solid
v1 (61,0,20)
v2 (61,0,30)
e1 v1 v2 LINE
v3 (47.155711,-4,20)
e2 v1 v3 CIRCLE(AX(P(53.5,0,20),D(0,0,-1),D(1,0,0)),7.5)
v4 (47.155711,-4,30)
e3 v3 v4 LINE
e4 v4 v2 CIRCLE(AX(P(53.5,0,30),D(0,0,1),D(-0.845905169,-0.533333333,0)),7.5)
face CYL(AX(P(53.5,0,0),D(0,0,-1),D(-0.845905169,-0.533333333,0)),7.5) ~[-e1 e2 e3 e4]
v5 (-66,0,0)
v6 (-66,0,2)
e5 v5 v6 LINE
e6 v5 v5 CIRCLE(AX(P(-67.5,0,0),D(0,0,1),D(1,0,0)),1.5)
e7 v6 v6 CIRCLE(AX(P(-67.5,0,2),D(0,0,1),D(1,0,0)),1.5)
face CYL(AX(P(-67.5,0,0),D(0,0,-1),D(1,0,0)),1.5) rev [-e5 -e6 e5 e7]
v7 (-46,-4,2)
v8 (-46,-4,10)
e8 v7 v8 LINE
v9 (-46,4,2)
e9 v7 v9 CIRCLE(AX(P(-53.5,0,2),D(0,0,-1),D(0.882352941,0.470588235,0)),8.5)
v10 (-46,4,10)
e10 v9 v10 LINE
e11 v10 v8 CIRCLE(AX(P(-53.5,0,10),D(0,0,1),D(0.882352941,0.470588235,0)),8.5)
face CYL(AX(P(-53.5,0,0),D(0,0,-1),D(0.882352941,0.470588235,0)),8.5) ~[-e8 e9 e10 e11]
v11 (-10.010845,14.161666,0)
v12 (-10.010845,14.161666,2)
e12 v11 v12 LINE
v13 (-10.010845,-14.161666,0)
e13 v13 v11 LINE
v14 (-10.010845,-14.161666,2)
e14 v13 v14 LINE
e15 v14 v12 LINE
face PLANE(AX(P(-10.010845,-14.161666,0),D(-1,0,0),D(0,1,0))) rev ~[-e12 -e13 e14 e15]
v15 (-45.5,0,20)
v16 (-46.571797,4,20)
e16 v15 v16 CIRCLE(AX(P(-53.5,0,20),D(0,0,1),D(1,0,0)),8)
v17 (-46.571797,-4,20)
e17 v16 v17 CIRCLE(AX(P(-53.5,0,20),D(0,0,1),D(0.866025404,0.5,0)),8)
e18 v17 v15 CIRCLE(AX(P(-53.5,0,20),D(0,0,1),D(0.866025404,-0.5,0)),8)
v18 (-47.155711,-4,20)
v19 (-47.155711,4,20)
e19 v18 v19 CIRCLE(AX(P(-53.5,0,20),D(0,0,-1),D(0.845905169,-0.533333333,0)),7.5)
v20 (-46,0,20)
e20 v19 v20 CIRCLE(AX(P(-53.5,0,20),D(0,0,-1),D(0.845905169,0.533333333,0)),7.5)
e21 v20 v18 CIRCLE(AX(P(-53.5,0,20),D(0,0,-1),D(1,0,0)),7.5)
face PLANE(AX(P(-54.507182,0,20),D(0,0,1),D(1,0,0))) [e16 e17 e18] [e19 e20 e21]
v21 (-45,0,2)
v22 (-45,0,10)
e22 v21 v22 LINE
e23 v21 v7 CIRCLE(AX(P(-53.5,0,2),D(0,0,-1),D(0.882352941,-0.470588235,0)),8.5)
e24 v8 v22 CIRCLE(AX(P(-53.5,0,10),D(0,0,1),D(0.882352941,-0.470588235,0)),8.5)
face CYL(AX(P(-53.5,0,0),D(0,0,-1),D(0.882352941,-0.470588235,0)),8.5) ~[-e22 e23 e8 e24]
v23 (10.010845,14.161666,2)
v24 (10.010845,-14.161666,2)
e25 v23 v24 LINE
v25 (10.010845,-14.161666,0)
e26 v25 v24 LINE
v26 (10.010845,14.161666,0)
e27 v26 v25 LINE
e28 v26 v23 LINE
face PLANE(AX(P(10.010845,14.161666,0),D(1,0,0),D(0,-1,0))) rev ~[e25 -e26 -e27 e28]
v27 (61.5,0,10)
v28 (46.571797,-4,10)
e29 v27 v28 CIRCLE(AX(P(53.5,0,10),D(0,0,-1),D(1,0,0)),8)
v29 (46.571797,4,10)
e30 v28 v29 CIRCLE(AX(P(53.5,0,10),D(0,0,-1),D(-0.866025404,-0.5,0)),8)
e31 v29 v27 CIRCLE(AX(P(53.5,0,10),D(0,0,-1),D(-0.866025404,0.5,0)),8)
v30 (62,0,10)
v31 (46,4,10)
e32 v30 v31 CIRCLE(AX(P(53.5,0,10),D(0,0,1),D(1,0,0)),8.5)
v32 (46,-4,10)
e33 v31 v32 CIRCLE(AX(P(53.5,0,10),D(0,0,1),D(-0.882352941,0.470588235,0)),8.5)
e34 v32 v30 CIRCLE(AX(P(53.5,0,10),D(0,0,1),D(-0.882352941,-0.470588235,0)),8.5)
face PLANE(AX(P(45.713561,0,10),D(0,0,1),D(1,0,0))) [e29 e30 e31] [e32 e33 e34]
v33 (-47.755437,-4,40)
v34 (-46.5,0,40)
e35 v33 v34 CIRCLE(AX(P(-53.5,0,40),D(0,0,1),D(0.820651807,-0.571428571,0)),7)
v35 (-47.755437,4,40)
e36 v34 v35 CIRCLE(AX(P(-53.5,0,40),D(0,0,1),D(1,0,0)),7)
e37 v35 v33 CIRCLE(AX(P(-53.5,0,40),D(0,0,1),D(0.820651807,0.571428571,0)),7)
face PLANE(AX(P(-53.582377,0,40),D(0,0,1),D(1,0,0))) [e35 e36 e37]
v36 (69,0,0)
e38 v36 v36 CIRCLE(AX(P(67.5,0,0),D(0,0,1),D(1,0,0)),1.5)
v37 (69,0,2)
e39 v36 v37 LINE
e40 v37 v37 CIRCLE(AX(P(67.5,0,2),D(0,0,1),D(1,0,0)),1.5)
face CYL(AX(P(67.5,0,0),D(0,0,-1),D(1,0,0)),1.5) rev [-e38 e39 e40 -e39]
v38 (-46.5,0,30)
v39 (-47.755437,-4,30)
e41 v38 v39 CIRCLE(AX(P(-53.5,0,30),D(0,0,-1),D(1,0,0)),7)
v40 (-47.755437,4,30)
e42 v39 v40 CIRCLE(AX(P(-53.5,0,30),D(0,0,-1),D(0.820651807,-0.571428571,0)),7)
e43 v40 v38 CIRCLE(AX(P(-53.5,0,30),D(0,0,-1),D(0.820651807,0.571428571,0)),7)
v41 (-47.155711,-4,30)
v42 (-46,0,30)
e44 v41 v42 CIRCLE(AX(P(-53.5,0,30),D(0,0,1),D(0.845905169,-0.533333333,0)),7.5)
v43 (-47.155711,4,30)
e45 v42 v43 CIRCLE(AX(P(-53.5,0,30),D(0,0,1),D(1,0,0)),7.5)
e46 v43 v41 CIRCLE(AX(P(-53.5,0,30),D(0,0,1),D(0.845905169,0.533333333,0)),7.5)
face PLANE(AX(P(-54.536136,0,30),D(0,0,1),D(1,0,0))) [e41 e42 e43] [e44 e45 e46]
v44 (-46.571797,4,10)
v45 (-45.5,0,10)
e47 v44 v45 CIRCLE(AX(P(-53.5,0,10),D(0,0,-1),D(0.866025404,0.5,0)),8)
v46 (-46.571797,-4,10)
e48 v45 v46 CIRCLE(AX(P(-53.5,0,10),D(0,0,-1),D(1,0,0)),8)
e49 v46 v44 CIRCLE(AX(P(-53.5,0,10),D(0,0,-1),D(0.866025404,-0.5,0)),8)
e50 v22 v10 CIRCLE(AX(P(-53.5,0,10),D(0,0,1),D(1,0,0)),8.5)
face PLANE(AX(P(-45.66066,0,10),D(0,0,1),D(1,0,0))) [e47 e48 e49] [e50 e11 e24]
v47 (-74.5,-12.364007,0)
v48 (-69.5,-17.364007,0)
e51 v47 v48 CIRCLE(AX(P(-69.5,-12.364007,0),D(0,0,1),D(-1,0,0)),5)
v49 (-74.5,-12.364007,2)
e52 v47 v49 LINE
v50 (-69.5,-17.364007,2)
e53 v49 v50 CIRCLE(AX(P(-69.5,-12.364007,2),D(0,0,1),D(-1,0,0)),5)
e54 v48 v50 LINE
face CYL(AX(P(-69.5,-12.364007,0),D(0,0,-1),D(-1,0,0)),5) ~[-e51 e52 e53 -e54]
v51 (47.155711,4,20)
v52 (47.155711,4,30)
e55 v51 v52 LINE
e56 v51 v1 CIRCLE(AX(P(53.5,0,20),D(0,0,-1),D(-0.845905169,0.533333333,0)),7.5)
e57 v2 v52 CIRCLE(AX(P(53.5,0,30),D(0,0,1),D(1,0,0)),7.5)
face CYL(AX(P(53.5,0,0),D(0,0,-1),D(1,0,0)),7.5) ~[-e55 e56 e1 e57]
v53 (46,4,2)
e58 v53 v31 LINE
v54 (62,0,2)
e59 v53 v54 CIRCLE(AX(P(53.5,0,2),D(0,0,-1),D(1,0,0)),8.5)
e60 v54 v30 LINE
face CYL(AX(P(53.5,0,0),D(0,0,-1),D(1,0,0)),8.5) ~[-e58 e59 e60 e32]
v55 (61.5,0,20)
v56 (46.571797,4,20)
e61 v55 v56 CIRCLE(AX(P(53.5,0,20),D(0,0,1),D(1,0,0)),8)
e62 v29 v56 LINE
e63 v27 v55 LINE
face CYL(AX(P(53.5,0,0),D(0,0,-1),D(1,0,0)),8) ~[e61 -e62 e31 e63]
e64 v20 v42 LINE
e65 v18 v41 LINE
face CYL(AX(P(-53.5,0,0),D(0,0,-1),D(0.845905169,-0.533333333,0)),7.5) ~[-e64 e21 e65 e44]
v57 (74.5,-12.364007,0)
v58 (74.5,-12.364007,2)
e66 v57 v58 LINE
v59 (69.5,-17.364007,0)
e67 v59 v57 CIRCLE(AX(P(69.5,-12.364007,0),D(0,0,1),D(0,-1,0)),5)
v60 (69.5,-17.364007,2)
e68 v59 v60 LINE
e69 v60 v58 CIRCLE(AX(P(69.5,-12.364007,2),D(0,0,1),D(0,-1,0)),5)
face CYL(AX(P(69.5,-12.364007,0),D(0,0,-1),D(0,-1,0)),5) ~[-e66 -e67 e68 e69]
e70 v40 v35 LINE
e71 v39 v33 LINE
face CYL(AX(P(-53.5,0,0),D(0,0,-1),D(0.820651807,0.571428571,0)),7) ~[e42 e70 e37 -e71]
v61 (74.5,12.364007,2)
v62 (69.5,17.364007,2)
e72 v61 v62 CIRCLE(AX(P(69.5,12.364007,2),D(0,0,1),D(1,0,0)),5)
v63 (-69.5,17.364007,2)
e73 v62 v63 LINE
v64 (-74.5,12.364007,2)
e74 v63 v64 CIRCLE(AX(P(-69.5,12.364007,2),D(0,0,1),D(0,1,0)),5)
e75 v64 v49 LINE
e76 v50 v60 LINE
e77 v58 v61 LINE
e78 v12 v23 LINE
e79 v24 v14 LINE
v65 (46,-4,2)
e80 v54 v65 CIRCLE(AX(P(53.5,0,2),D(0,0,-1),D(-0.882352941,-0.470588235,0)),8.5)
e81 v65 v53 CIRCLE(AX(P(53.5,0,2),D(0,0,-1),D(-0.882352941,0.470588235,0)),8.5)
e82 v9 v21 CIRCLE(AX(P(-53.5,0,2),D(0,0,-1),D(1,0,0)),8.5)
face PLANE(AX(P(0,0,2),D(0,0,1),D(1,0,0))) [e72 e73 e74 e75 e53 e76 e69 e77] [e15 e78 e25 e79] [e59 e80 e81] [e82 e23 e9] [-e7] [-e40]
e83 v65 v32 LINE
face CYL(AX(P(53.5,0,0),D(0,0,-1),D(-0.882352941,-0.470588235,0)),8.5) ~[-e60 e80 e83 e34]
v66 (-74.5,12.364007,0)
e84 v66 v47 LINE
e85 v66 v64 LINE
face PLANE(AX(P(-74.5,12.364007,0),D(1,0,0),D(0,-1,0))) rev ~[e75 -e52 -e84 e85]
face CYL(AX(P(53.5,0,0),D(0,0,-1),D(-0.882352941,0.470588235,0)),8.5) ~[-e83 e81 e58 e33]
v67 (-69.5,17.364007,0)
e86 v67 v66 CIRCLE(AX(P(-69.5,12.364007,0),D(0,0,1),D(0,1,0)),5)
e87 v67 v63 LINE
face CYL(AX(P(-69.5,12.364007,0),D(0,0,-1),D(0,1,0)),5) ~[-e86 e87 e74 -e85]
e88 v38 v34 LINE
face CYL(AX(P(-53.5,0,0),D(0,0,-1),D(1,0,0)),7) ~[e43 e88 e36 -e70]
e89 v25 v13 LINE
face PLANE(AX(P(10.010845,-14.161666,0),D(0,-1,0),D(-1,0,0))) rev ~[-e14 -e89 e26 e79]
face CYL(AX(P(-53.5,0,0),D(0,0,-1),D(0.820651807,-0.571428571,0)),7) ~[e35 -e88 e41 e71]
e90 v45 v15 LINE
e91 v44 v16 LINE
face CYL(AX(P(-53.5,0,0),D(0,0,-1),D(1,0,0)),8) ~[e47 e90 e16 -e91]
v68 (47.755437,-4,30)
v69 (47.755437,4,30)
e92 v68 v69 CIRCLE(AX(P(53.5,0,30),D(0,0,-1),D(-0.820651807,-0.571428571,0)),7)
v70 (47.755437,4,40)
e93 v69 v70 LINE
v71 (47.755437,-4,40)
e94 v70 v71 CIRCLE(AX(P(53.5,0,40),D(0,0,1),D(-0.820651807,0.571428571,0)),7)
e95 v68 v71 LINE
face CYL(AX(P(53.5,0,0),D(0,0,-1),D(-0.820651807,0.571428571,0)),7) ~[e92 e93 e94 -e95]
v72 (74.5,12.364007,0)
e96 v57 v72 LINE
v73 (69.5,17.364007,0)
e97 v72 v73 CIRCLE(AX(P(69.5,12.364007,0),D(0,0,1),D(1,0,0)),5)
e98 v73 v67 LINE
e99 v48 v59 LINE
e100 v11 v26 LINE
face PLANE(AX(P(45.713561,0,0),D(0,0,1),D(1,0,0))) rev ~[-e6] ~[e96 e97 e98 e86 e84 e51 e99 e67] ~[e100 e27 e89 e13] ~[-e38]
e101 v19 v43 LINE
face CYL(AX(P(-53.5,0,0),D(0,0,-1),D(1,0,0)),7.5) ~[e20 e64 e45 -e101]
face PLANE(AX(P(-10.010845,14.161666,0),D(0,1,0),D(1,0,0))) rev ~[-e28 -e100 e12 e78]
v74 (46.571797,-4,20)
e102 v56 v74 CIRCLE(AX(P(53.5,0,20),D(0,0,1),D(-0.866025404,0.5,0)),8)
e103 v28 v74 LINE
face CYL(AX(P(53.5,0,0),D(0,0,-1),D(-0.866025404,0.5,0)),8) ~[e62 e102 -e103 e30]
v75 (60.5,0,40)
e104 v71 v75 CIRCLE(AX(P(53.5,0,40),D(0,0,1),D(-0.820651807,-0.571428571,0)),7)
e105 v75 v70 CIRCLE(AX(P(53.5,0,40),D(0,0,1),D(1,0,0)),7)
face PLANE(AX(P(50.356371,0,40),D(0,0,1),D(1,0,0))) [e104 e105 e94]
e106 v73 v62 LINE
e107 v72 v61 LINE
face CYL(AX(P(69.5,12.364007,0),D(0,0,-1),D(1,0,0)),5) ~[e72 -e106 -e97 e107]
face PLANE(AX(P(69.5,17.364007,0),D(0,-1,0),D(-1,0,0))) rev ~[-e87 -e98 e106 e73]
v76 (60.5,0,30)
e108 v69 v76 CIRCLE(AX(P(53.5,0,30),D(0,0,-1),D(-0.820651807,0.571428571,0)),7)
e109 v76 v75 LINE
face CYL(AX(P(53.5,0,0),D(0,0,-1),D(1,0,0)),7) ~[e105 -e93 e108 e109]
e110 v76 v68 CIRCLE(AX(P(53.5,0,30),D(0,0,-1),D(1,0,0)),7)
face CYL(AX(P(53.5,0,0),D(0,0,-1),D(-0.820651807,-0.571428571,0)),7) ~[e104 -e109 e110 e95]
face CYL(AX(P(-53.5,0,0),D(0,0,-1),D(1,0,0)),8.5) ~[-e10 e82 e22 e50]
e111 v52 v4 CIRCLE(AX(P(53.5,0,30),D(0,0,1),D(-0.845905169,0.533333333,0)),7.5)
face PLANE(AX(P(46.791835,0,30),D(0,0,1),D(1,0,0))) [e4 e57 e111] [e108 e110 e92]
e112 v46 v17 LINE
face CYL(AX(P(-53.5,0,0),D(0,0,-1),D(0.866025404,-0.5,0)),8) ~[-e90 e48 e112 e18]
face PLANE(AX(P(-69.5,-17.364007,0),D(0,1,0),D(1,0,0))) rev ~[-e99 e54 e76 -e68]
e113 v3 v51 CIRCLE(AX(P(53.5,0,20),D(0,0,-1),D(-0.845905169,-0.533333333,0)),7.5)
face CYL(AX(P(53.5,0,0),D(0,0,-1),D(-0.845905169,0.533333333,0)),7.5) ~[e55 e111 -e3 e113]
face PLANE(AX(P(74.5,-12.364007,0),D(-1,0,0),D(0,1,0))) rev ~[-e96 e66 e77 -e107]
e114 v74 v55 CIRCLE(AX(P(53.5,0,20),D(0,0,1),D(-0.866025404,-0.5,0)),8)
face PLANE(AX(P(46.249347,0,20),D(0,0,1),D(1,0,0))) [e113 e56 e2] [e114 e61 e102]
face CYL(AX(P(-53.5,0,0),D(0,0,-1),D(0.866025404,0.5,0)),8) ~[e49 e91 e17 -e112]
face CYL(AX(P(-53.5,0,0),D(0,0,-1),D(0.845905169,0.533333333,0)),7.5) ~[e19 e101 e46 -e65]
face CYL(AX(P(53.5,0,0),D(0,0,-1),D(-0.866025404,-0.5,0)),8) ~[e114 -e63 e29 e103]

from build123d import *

# Parameters (mm, degrees)
F0_R     = 1.5
F1_DEPTH = 2
F2_DEPTH = 40
F3_DEPTH = 30
F4_DEPTH = 20
F5_DEPTH = 10


with BuildPart() as f1:
    # F0 (on Top) → F1 (new body)
    with BuildSketch(Plane.XY):
        with BuildLine():
            Line((69.5, 17.3640065603), (-69.5, 17.3640065603))
            ThreePointArc((-69.5, 17.3640065603), (-73.0355339059, 15.8995404662), (-74.5, 12.3640065603))
            Line((-74.5, 12.3640065603), (-74.5, -12.3640065603))
            ThreePointArc((-74.5, -12.3640065603), (-73.0355339059, -15.8995404662), (-69.5, -17.3640065603))
            Line((-69.5, -17.3640065603), (69.5, -17.3640065603))
            ThreePointArc((69.5, -17.3640065603), (73.0355339059, -15.8995404662), (74.5, -12.3640065603))
            Line((74.5, -12.3640065603), (74.5, 12.3640065603))
            ThreePointArc((74.5, 12.3640065603), (73.0355339059, 15.8995404662), (69.5, 17.3640065603))
        make_face()
        with Locations((-67.5, 0)):
            Circle(F0_R, mode=Mode.SUBTRACT)
        with BuildLine():
            ThreePointArc((-46, -4), (-62, 0), (-46, 4))
            Line((-46, 4), (-10.0108450279, 4))
            Line((-10.0108450279, 4), (-10.0108450279, 14.1616659239))
            Line((-10.0108450279, 14.1616659239), (10.0108450279, 14.1616659239))
            Line((10.0108450279, 14.1616659239), (10.0108450279, 4))
            Line((10.0108450279, 4), (46, 4))
            ThreePointArc((46, 4), (55.5615528128, 8.2462112512), (62, 0))
            ThreePointArc((62, 0), (55.5615528128, -8.2462112512), (46, -4))
            Line((46, -4), (10.0108450279, -4))
            Line((10.0108450279, -4), (10.0108450279, -14.1616659239))
            Line((10.0108450279, -14.1616659239), (-10.0108450279, -14.1616659239))
            Line((-10.0108450279, -14.1616659239), (-10.0108450279, -4))
            Line((-10.0108450279, -4), (-46, -4))
        make_face(mode=Mode.SUBTRACT)
        with Locations((67.5, 0)):
            Circle(F0_R, mode=Mode.SUBTRACT)
        with BuildLine():
            Line((-10.0108450279, 4), (-46, 4))
            ThreePointArc((-46, 4), (-45.2537887488, 2.0615528128), (-45, 0))
            ThreePointArc((-45, 0), (-45.2537887488, -2.0615528128), (-46, -4))
            Line((-46, -4), (-10.0108450279, -4))
            Line((-10.0108450279, -4), (-10.0108450279, 4))
        make_face()
        with BuildLine():
            Line((46, 4), (10.0108450279, 4))
            Line((10.0108450279, 4), (10.0108450279, -4))
            Line((10.0108450279, -4), (46, -4))
            ThreePointArc((46, -4), (45, 0), (46, 4))
        make_face()
        with BuildLine():
            ThreePointArc((-47.7554373535, -4), (-46.8212299588, -2.0961943462), (-46.5, 0))
            ThreePointArc((-46.5, 0), (-46.8212299588, 2.0961943462), (-47.7554373535, 4))
            Line((-47.7554373535, 4), (-53.5, 4))
            Line((-53.5, 4), (-53.5, -4))
            Line((-53.5, -4), (-47.7554373535, -4))
        make_face()
        with BuildLine():
            Line((-53.5, 4), (-47.7554373535, 4))
            ThreePointArc((-47.7554373535, 4), (-60.5, 0), (-47.7554373535, -4))
            Line((-47.7554373535, -4), (-53.5, -4))
            Line((-53.5, -4), (-53.5, 4))
        make_face()
        with BuildLine():
            ThreePointArc((-47.7554373535, -4), (-60.5, 0), (-47.7554373535, 4))
            Line((-47.7554373535, 4), (-47.1557112298, 4))
            ThreePointArc((-47.1557112298, 4), (-61, 0), (-47.1557112298, -4))
            Line((-47.1557112298, -4), (-47.7554373535, -4))
        make_face()
        with BuildLine():
            ThreePointArc((-47.1557112298, -4), (-61, 0), (-47.1557112298, 4))
            Line((-47.1557112298, 4), (-46.5717967697, 4))
            ThreePointArc((-46.5717967697, 4), (-61.5, 0), (-46.5717967697, -4))
            Line((-46.5717967697, -4), (-47.1557112298, -4))
        make_face()
        with BuildLine():
            ThreePointArc((-46.5717967697, -4), (-61.5, 0), (-46.5717967697, 4))
            Line((-46.5717967697, 4), (-46, 4))
            ThreePointArc((-46, 4), (-62, 0), (-46, -4))
            Line((-46, -4), (-46.5717967697, -4))
        make_face()
        with BuildLine():
            ThreePointArc((-47.7554373535, 4), (-46.8212299588, 2.0961943462), (-46.5, 0))
            ThreePointArc((-46.5, 0), (-46.8212299588, -2.0961943462), (-47.7554373535, -4))
            Line((-47.7554373535, -4), (-47.1557112298, -4))
            ThreePointArc((-47.1557112298, -4), (-46.2947184033, -2.0818062138), (-46, 0))
            ThreePointArc((-46, 0), (-46.2947184033, 2.0818062138), (-47.1557112298, 4))
            Line((-47.1557112298, 4), (-47.7554373535, 4))
        make_face()
        with BuildLine():
            Line((-46.5717967697, 4), (-47.1557112298, 4))
            ThreePointArc((-47.1557112298, 4), (-46.2947184033, 2.0818062138), (-46, 0))
            ThreePointArc((-46, 0), (-46.2947184033, -2.0818062138), (-47.1557112298, -4))
            Line((-47.1557112298, -4), (-46.5717967697, -4))
            ThreePointArc((-46.5717967697, -4), (-45.7725933897, -2.0705523608), (-45.5, 0))
            ThreePointArc((-45.5, 0), (-45.7725933897, 2.0705523608), (-46.5717967697, 4))
        make_face()
        with BuildLine():
            Line((-46, 4), (-46.5717967697, 4))
            ThreePointArc((-46.5717967697, 4), (-45.7725933897, 2.0705523608), (-45.5, 0))
            ThreePointArc((-45.5, 0), (-45.7725933897, -2.0705523608), (-46.5717967697, -4))
            Line((-46.5717967697, -4), (-46, -4))
            ThreePointArc((-46, -4), (-45.2537887488, -2.0615528128), (-45, 0))
            ThreePointArc((-45, 0), (-45.2537887488, 2.0615528128), (-46, 4))
        make_face()
        with BuildLine():
            ThreePointArc((60.5, 0), (55.5961943462, 6.6787700412), (47.7554373535, 4))
            Line((47.7554373535, 4), (53.5, 4))
            Line((53.5, 4), (53.5, -4))
            Line((53.5, -4), (47.7554373535, -4))
            ThreePointArc((47.7554373535, -4), (55.5961943462, -6.6787700412), (60.5, 0))
        make_face()
        with BuildLine():
            Line((53.5, 4), (47.7554373535, 4))
            ThreePointArc((47.7554373535, 4), (46.5, 0), (47.7554373535, -4))
            Line((47.7554373535, -4), (53.5, -4))
            Line((53.5, -4), (53.5, 4))
        make_face()
        with BuildLine():
            Line((47.7554373535, 4), (47.1557112298, 4))
            ThreePointArc((47.1557112298, 4), (46, 0), (47.1557112298, -4))
            Line((47.1557112298, -4), (47.7554373535, -4))
            ThreePointArc((47.7554373535, -4), (46.5, 0), (47.7554373535, 4))
        make_face()
        with BuildLine():
            Line((47.1557112298, 4), (46.5717967697, 4))
            ThreePointArc((46.5717967697, 4), (45.5, 0), (46.5717967697, -4))
            Line((46.5717967697, -4), (47.1557112298, -4))
            ThreePointArc((47.1557112298, -4), (46, 0), (47.1557112298, 4))
        make_face()
        with BuildLine():
            Line((46.5717967697, 4), (46, 4))
            ThreePointArc((46, 4), (45, 0), (46, -4))
            Line((46, -4), (46.5717967697, -4))
            ThreePointArc((46.5717967697, -4), (45.5, 0), (46.5717967697, 4))
        make_face()
        with BuildLine():
            ThreePointArc((62, 0), (55.5615528128, 8.2462112512), (46, 4))
            Line((46, 4), (46.5717967697, 4))
            ThreePointArc((46.5717967697, 4), (55.5705523608, 7.7274066103), (61.5, 0))
            ThreePointArc((61.5, 0), (55.5705523608, -7.7274066103), (46.5717967697, -4))
            Line((46.5717967697, -4), (46, -4))
            ThreePointArc((46, -4), (55.5615528128, -8.2462112512), (62, 0))
        make_face()
        with BuildLine():
            ThreePointArc((61.5, 0), (55.5705523608, 7.7274066103), (46.5717967697, 4))
            Line((46.5717967697, 4), (47.1557112298, 4))
            ThreePointArc((47.1557112298, 4), (55.5818062138, 7.2052815967), (61, 0))
            ThreePointArc((61, 0), (55.5818062138, -7.2052815967), (47.1557112298, -4))
            Line((47.1557112298, -4), (46.5717967697, -4))
            ThreePointArc((46.5717967697, -4), (55.5705523608, -7.7274066103), (61.5, 0))
        make_face()
        with BuildLine():
            ThreePointArc((61, 0), (55.5818062138, 7.2052815967), (47.1557112298, 4))
            Line((47.1557112298, 4), (47.7554373535, 4))
            ThreePointArc((47.7554373535, 4), (55.5961943462, 6.6787700412), (60.5, 0))
            ThreePointArc((60.5, 0), (55.5961943462, -6.6787700412), (47.7554373535, -4))
            Line((47.7554373535, -4), (47.1557112298, -4))
            ThreePointArc((47.1557112298, -4), (55.5818062138, -7.2052815967), (61, 0))
        make_face()
    extrude(amount=F1_DEPTH)

    # F0 (on Top) → F2 (join)
    with BuildSketch(Plane.XY):
        with BuildLine():
            Line((-53.5, 4), (-47.7554373535, 4))
            ThreePointArc((-47.7554373535, 4), (-60.5, 0), (-47.7554373535, -4))
            Line((-47.7554373535, -4), (-53.5, -4))
            Line((-53.5, -4), (-53.5, 4))
        make_face()
        with BuildLine():
            ThreePointArc((-47.7554373535, -4), (-46.8212299588, -2.0961943462), (-46.5, 0))
            ThreePointArc((-46.5, 0), (-46.8212299588, 2.0961943462), (-47.7554373535, 4))
            Line((-47.7554373535, 4), (-53.5, 4))
            Line((-53.5, 4), (-53.5, -4))
            Line((-53.5, -4), (-47.7554373535, -4))
        make_face()
        with BuildLine():
            Line((53.5, 4), (47.7554373535, 4))
            ThreePointArc((47.7554373535, 4), (46.5, 0), (47.7554373535, -4))
            Line((47.7554373535, -4), (53.5, -4))
            Line((53.5, -4), (53.5, 4))
        make_face()
        with BuildLine():
            ThreePointArc((60.5, 0), (55.5961943462, 6.6787700412), (47.7554373535, 4))
            Line((47.7554373535, 4), (53.5, 4))
            Line((53.5, 4), (53.5, -4))
            Line((53.5, -4), (47.7554373535, -4))
            ThreePointArc((47.7554373535, -4), (55.5961943462, -6.6787700412), (60.5, 0))
        make_face()
    extrude(amount=F2_DEPTH)

    # F0 (on Top) → F3 (join)
    with BuildSketch(Plane.XY):
        with BuildLine():
            ThreePointArc((-47.7554373535, -4), (-60.5, 0), (-47.7554373535, 4))
            Line((-47.7554373535, 4), (-47.1557112298, 4))
            ThreePointArc((-47.1557112298, 4), (-61, 0), (-47.1557112298, -4))
            Line((-47.1557112298, -4), (-47.7554373535, -4))
        make_face()
        with BuildLine():
            ThreePointArc((-47.7554373535, 4), (-46.8212299588, 2.0961943462), (-46.5, 0))
            ThreePointArc((-46.5, 0), (-46.8212299588, -2.0961943462), (-47.7554373535, -4))
            Line((-47.7554373535, -4), (-47.1557112298, -4))
            ThreePointArc((-47.1557112298, -4), (-46.2947184033, -2.0818062138), (-46, 0))
            ThreePointArc((-46, 0), (-46.2947184033, 2.0818062138), (-47.1557112298, 4))
            Line((-47.1557112298, 4), (-47.7554373535, 4))
        make_face()
        with BuildLine():
            Line((47.7554373535, 4), (47.1557112298, 4))
            ThreePointArc((47.1557112298, 4), (46, 0), (47.1557112298, -4))
            Line((47.1557112298, -4), (47.7554373535, -4))
            ThreePointArc((47.7554373535, -4), (46.5, 0), (47.7554373535, 4))
        make_face()
        with BuildLine():
            ThreePointArc((61, 0), (55.5818062138, 7.2052815967), (47.1557112298, 4))
            Line((47.1557112298, 4), (47.7554373535, 4))
            ThreePointArc((47.7554373535, 4), (55.5961943462, 6.6787700412), (60.5, 0))
            ThreePointArc((60.5, 0), (55.5961943462, -6.6787700412), (47.7554373535, -4))
            Line((47.7554373535, -4), (47.1557112298, -4))
            ThreePointArc((47.1557112298, -4), (55.5818062138, -7.2052815967), (61, 0))
        make_face()
    extrude(amount=F3_DEPTH)

    # F0 (on Top) → F4 (join)
    with BuildSketch(Plane.XY):
        with BuildLine():
            ThreePointArc((-47.1557112298, -4), (-61, 0), (-47.1557112298, 4))
            Line((-47.1557112298, 4), (-46.5717967697, 4))
            ThreePointArc((-46.5717967697, 4), (-61.5, 0), (-46.5717967697, -4))
            Line((-46.5717967697, -4), (-47.1557112298, -4))
        make_face()
        with BuildLine():
            Line((-46.5717967697, 4), (-47.1557112298, 4))
            ThreePointArc((-47.1557112298, 4), (-46.2947184033, 2.0818062138), (-46, 0))
            ThreePointArc((-46, 0), (-46.2947184033, -2.0818062138), (-47.1557112298, -4))
            Line((-47.1557112298, -4), (-46.5717967697, -4))
            ThreePointArc((-46.5717967697, -4), (-45.7725933897, -2.0705523608), (-45.5, 0))
            ThreePointArc((-45.5, 0), (-45.7725933897, 2.0705523608), (-46.5717967697, 4))
        make_face()
        with BuildLine():
            Line((47.1557112298, 4), (46.5717967697, 4))
            ThreePointArc((46.5717967697, 4), (45.5, 0), (46.5717967697, -4))
            Line((46.5717967697, -4), (47.1557112298, -4))
            ThreePointArc((47.1557112298, -4), (46, 0), (47.1557112298, 4))
        make_face()
        with BuildLine():
            ThreePointArc((61.5, 0), (55.5705523608, 7.7274066103), (46.5717967697, 4))
            Line((46.5717967697, 4), (47.1557112298, 4))
            ThreePointArc((47.1557112298, 4), (55.5818062138, 7.2052815967), (61, 0))
            ThreePointArc((61, 0), (55.5818062138, -7.2052815967), (47.1557112298, -4))
            Line((47.1557112298, -4), (46.5717967697, -4))
            ThreePointArc((46.5717967697, -4), (55.5705523608, -7.7274066103), (61.5, 0))
        make_face()
    extrude(amount=F4_DEPTH)

    # F0 (on Top) → F5 (join)
    with BuildSketch(Plane.XY):
        with BuildLine():
            Line((46.5717967697, 4), (46, 4))
            ThreePointArc((46, 4), (45, 0), (46, -4))
            Line((46, -4), (46.5717967697, -4))
            ThreePointArc((46.5717967697, -4), (45.5, 0), (46.5717967697, 4))
        make_face()
        with BuildLine():
            ThreePointArc((62, 0), (55.5615528128, 8.2462112512), (46, 4))
            Line((46, 4), (46.5717967697, 4))
            ThreePointArc((46.5717967697, 4), (55.5705523608, 7.7274066103), (61.5, 0))
            ThreePointArc((61.5, 0), (55.5705523608, -7.7274066103), (46.5717967697, -4))
            Line((46.5717967697, -4), (46, -4))
            ThreePointArc((46, -4), (55.5615528128, -8.2462112512), (62, 0))
        make_face()
        with BuildLine():
            Line((-46, 4), (-46.5717967697, 4))
            ThreePointArc((-46.5717967697, 4), (-45.7725933897, 2.0705523608), (-45.5, 0))
            ThreePointArc((-45.5, 0), (-45.7725933897, -2.0705523608), (-46.5717967697, -4))
            Line((-46.5717967697, -4), (-46, -4))
            ThreePointArc((-46, -4), (-45.2537887488, -2.0615528128), (-45, 0))
            ThreePointArc((-45, 0), (-45.2537887488, 2.0615528128), (-46, 4))
        make_face()
        with BuildLine():
            ThreePointArc((-46.5717967697, -4), (-61.5, 0), (-46.5717967697, 4))
            Line((-46.5717967697, 4), (-46, 4))
            ThreePointArc((-46, 4), (-62, 0), (-46, -4))
            Line((-46, -4), (-46.5717967697, -4))
        make_face()
    extrude(amount=F5_DEPTH)


solid = f1.part
